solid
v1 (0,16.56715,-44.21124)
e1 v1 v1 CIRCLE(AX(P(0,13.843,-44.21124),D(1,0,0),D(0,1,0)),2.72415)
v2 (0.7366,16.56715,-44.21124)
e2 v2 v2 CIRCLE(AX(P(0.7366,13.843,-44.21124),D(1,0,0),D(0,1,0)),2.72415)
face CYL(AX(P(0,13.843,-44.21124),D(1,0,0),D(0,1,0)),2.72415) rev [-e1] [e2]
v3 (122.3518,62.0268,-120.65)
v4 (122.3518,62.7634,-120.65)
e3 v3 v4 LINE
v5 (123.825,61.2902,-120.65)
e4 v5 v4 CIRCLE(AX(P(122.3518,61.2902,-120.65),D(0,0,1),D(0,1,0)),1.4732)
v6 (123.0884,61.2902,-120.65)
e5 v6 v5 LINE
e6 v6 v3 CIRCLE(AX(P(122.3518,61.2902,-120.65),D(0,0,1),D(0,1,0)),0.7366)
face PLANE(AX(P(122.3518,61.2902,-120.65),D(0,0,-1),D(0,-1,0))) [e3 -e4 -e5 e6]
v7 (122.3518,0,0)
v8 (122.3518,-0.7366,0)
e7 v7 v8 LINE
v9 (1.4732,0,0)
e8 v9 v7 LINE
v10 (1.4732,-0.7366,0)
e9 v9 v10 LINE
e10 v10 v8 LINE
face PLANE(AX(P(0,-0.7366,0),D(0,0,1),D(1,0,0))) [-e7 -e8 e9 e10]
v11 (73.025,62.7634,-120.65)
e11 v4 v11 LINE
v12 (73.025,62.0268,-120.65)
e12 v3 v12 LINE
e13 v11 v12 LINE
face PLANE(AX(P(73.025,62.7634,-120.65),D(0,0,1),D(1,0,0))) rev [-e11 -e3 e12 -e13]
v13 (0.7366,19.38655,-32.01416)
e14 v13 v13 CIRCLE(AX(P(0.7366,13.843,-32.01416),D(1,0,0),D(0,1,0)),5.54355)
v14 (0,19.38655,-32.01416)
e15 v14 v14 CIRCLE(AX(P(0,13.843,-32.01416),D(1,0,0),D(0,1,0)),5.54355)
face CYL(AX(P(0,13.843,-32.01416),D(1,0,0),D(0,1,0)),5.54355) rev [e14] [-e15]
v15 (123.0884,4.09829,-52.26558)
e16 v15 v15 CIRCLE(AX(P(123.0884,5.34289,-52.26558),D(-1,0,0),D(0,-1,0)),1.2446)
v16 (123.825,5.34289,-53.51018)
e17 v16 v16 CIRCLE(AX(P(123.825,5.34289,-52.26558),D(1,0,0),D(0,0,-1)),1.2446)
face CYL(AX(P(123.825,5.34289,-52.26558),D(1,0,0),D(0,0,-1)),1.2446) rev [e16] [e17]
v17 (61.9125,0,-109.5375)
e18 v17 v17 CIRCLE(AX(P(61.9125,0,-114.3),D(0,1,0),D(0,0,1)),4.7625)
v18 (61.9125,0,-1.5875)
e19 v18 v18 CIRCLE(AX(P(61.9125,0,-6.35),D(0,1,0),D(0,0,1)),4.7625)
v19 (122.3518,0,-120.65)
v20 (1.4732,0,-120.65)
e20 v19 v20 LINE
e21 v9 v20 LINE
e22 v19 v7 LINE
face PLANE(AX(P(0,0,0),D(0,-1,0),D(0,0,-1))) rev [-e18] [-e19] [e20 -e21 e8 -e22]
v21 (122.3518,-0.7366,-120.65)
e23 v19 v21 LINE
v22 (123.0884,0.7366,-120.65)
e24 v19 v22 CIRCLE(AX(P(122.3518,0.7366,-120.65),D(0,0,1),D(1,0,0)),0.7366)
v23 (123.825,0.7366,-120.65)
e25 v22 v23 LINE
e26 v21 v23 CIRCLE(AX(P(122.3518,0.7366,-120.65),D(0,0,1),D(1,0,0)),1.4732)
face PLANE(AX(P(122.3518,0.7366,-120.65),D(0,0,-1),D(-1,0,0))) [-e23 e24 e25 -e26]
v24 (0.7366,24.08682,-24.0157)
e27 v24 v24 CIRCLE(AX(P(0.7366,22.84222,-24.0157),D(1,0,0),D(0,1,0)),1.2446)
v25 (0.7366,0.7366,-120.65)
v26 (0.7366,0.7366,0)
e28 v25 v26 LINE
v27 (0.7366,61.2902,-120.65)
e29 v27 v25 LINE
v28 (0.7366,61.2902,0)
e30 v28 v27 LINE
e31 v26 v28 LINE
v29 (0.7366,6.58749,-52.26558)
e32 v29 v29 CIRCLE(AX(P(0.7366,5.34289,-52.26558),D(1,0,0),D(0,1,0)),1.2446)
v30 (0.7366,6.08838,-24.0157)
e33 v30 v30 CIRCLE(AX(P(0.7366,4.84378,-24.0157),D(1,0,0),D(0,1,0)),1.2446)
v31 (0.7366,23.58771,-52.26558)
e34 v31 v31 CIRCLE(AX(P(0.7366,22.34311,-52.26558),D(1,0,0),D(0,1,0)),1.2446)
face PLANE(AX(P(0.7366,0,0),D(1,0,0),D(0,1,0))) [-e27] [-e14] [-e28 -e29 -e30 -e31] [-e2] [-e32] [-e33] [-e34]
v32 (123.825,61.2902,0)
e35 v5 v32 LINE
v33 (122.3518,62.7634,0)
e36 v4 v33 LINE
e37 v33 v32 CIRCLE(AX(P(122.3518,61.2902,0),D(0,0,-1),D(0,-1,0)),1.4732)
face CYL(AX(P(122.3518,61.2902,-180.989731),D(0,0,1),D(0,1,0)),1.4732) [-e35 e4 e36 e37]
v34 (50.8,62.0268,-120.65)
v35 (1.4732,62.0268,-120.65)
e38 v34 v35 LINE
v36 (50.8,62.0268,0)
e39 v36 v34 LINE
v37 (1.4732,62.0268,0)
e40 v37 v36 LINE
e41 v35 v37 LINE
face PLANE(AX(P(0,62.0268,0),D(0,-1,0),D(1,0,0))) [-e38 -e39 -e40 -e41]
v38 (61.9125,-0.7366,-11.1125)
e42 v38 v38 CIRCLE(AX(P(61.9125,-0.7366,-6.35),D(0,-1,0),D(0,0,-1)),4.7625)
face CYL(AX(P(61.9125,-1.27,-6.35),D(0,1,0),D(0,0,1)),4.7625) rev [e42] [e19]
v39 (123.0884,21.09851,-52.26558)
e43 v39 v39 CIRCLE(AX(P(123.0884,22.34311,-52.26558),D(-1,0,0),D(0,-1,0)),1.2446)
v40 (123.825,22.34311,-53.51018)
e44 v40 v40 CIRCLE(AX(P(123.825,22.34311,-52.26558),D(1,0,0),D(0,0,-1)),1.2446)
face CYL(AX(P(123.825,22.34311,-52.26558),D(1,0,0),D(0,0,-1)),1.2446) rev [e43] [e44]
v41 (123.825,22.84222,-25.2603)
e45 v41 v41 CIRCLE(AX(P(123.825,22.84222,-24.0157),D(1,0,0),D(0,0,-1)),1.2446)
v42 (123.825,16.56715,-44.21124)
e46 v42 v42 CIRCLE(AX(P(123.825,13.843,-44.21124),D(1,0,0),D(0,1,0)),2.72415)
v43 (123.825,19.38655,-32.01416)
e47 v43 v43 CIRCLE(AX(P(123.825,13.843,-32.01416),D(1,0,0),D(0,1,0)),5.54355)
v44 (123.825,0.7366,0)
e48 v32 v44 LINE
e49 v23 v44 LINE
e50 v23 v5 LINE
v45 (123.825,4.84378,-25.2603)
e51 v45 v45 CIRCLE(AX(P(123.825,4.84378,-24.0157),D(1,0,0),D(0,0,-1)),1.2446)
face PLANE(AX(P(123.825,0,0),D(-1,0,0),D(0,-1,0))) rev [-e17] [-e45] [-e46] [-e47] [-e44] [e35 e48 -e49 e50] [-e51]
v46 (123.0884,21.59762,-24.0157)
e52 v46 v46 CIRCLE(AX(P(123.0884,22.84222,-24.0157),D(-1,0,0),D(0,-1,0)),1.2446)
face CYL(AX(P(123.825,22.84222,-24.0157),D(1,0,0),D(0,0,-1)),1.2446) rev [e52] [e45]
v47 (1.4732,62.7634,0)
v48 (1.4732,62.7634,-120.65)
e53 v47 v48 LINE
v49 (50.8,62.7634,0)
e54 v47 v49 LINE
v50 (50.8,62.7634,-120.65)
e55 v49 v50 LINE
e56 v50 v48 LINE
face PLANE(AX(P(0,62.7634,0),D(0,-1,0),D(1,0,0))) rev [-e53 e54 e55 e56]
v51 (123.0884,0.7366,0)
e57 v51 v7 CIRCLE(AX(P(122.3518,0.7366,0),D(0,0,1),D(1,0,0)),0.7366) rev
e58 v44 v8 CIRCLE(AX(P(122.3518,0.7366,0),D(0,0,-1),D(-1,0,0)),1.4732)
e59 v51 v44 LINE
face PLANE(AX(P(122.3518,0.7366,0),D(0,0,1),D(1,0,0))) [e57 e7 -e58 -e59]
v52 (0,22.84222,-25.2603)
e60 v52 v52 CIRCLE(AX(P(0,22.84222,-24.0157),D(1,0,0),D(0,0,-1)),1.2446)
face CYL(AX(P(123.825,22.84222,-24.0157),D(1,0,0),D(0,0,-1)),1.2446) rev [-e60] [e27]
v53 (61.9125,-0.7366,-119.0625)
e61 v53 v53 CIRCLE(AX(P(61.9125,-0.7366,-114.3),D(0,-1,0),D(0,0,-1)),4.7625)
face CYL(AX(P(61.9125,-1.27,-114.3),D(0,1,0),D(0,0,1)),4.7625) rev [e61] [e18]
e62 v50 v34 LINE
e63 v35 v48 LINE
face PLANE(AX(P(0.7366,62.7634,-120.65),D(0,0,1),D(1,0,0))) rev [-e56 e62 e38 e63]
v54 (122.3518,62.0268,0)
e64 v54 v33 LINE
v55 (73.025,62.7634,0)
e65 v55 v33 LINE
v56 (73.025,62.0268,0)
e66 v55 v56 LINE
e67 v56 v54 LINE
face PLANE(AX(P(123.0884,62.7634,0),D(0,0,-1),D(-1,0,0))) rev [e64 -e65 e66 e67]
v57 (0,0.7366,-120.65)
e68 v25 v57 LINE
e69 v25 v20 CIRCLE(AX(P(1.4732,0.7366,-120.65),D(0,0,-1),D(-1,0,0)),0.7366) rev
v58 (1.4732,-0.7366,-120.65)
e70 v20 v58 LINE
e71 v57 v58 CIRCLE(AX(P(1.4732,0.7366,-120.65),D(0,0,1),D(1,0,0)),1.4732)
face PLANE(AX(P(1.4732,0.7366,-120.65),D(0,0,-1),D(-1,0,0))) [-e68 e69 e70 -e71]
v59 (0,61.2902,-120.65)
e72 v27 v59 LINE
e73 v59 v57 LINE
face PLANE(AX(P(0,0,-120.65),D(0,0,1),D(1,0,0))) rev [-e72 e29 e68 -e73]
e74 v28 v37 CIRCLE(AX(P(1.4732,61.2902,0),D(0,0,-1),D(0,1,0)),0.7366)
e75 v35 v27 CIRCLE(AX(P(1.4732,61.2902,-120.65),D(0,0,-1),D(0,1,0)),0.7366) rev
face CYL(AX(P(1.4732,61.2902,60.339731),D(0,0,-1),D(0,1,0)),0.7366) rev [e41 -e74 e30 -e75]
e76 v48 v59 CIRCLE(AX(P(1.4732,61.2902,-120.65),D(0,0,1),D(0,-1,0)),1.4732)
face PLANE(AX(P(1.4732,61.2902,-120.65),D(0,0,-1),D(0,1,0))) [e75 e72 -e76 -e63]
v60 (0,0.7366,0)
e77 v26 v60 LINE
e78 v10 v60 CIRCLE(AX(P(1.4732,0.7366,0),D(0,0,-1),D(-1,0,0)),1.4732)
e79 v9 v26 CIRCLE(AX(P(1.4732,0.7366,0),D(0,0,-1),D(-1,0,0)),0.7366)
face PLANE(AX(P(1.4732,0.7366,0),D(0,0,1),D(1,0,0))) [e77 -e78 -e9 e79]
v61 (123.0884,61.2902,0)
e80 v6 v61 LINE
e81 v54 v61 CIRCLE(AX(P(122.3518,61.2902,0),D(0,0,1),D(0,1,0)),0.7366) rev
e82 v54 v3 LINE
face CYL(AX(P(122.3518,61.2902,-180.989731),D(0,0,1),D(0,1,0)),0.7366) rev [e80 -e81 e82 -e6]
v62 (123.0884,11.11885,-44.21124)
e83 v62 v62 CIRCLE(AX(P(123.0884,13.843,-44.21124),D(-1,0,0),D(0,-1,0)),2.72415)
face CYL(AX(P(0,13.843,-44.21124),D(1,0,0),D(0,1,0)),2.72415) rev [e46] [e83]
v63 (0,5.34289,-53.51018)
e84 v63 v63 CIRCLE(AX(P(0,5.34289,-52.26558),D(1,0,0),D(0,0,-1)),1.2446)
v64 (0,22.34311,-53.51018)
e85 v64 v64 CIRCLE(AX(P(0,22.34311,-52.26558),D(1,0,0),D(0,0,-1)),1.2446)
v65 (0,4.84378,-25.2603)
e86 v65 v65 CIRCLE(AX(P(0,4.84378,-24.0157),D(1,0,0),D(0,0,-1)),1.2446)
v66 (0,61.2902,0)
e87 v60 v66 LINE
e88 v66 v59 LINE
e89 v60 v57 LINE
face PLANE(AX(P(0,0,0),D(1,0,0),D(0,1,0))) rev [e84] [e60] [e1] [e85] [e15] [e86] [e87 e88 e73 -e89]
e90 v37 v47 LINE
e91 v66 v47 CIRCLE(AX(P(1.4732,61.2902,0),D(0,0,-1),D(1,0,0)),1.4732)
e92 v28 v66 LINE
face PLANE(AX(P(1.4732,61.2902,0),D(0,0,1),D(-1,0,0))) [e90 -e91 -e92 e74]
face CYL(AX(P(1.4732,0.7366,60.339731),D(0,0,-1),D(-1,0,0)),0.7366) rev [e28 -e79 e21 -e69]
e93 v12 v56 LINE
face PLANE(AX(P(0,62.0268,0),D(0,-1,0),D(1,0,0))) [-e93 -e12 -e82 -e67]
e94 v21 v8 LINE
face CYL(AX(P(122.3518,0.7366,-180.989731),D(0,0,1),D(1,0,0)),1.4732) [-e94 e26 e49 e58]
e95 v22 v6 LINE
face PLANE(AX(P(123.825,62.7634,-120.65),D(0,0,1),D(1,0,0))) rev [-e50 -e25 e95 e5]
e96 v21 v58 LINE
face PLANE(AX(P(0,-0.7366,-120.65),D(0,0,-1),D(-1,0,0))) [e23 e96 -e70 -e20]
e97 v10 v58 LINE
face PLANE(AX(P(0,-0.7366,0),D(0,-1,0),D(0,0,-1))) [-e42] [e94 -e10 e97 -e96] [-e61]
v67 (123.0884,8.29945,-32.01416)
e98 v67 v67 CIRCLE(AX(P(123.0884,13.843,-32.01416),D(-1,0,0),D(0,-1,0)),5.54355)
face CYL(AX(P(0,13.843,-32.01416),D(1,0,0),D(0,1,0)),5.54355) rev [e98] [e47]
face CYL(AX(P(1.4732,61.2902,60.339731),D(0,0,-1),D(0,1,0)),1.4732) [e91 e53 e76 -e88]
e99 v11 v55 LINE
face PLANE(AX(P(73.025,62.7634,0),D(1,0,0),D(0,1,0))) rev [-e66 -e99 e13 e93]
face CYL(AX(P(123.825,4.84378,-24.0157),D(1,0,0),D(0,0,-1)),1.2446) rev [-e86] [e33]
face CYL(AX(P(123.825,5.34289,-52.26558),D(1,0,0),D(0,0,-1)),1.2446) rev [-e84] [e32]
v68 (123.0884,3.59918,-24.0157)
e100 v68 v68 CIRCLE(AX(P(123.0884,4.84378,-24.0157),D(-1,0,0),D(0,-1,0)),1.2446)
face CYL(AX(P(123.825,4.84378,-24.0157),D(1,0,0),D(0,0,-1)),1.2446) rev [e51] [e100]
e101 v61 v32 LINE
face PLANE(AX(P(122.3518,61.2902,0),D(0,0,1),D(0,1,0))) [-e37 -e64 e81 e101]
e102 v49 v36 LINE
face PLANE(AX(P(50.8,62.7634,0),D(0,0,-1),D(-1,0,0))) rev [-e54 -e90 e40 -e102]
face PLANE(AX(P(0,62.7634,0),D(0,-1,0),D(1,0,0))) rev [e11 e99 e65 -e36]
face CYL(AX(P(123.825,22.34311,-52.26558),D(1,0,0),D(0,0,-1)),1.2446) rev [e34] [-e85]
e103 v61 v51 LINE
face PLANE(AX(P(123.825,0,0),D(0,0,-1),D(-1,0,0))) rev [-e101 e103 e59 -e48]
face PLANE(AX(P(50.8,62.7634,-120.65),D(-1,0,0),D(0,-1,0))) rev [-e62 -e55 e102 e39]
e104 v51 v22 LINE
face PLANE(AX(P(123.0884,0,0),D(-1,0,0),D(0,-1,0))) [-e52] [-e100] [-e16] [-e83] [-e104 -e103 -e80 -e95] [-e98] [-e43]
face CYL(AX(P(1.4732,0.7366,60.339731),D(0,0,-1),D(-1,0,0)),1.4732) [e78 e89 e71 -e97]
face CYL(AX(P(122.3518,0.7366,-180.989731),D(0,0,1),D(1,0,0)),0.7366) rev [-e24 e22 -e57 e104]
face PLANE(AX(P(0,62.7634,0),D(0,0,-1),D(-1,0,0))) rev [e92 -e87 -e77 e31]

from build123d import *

# Parameters (mm, degrees)
SKETCH1_W                      = 123.825
SKETCH1_H                      = 120.65
BASE_FLANGE1_DEPTH             = 0.7366
EDGE_FLANGE1_STRIP_W           = 4.4196
EDGE_FLANGE1_STRIP_H           = 0.7366
EDGE_FLANGE1_STRIP_CUT_DEPTH   = 120.65
EDGE_FLANGE1_STRIP_2_W         = 4.4196
EDGE_FLANGE1_STRIP_2_H         = 0.7366
EDGE_FLANGE1_STRIP_CUT_2_DEPTH = 120.65
EDGE_FLANGE1_DEPTH             = 120.65
EDGE_FLANGE1_BEND_DEPTH        = 120.65
EDGE_FLANGE2_STRIP_W           = 4.4196
EDGE_FLANGE2_STRIP_H           = 0.7366
EDGE_FLANGE2_STRIP_CUT_DEPTH   = 120.65
EDGE_FLANGE2_DEPTH             = 120.65
EDGE_FLANGE3_STRIP_W           = 4.4196
EDGE_FLANGE3_STRIP_H           = 0.7366
EDGE_FLANGE3_STRIP_CUT_DEPTH   = 120.65
EDGE_FLANGE3_DEPTH             = 120.65
F_4_CLEARANCE_HOLE1_D          = 2.4892
SKETCH28_R                     = 5.54355
SKETCH28_R_2                   = 2.72415
CUT_EXTRUDE1_DEPTH             = 221.859453756
UNFOLD1_OUTLINE_W              = 50.8
UNFOLD1_OUTLINE_H              = 120.65
UNFOLD1_DEPTH                  = 62.7634
UNFOLD1_START                  = -0.7366
UNFOLD1_2_OUTLINE_W            = 162.678345723
UNFOLD1_2_OUTLINE_H            = 120.65
UNFOLD1_2_OUTLINE_R            = 1.2446
UNFOLD1_2_OUTLINE_R_2          = 5.54355
UNFOLD1_2_OUTLINE_R_3          = 2.72415
UNFOLD1_2_DEPTH                = 0.7366
SKETCH30_R                     = 4.7625
CUT_EXTRUDE2_DEPTH             = 1.27
FOLD1_START                    = -111.878345723
FOLD1_OUTLINE_W                = 0.7366
FOLD1_OUTLINE_H                = 120.65
FOLD1_DEPTH                    = 112.029702291
FOLD1_START_2                  = 123.673643432
FOLD1_2_OUTLINE_W              = 0.7366
FOLD1_2_OUTLINE_H              = 120.65
FOLD1_2_DEPTH                  = 112.029702291
FOLD1_START_3                  = 1.4732
FOLD1_3_OUTLINE_W              = 0.7366
FOLD1_3_OUTLINE_H              = 120.65
FOLD1_3_DEPTH                  = 49.3268
FOLD1_START_4                  = 73.025
FOLD1_4_OUTLINE_W              = 0.7366
FOLD1_4_OUTLINE_H              = 120.65
FOLD1_4_DEPTH                  = 49.3268
FOLD1_START_5                  = 0.732563432
FOLD1_5_OUTLINE_W              = 62.0268
FOLD1_5_OUTLINE_H              = 120.65
FOLD1_5_OUTLINE_R              = 1.2446
FOLD1_5_OUTLINE_R_2            = 2.72415
FOLD1_5_OUTLINE_R_3            = 5.54355
FOLD1_5_DEPTH                  = 0.004036568
FOLD1_START_6                  = 123.0884
FOLD1_6_OUTLINE_W              = 62.0268
FOLD1_6_OUTLINE_H              = 120.65
FOLD1_6_OUTLINE_R              = 1.2446
FOLD1_6_OUTLINE_R_2            = 2.72415
FOLD1_6_OUTLINE_R_3            = 5.54355
FOLD1_6_DEPTH                  = 0.004036568
FOLD1_7_OUTLINE_W              = 62.0268
FOLD1_7_OUTLINE_H              = 120.65
FOLD1_7_OUTLINE_R              = 1.2446
FOLD1_7_OUTLINE_R_2            = 2.72415
FOLD1_7_OUTLINE_R_3            = 5.54355
FOLD1_7_DEPTH                  = 1.4732
FOLD1_START_7                  = 122.3518
FOLD1_8_OUTLINE_W              = 62.0268
FOLD1_8_OUTLINE_H              = 120.65
FOLD1_8_OUTLINE_R              = 1.2446
FOLD1_8_OUTLINE_R_2            = 2.72415
FOLD1_8_OUTLINE_R_3            = 5.54355
FOLD1_8_DEPTH                  = 1.4732
FOLD1_START_8                  = -120.65
FOLD1_9_DEPTH                  = 120.65
FOLD1_10_DEPTH                 = 120.65


with BuildPart() as part:
    # Base-Flange1: sheet metal written as solids
    # Sketch1 → Base-Flange1 (new body)
    with BuildSketch(Plane(origin=(0, 0, 0), x_dir=(1, 0, 0), z_dir=(0, 1, 0))):
        with Locations((61.9125, 60.325)):
            Rectangle(SKETCH1_W, SKETCH1_H)
    extrude(amount=-BASE_FLANGE1_DEPTH)

    # Edge-Flange1: sheet metal written as solids
    # Edge-Flange1 strip (on a plane across the edge) → Edge-Flange1 strip cut (cut)
    with BuildSketch(Plane(origin=(123.825, 0, 0), x_dir=(-1, 0, 0), z_dir=(0, 0, -1))):
        with Locations((-0.7366, -0.3683)):
            Rectangle(EDGE_FLANGE1_STRIP_W, EDGE_FLANGE1_STRIP_H)
    extrude(amount=EDGE_FLANGE1_STRIP_CUT_DEPTH, mode=Mode.SUBTRACT)

    # Edge-Flange1 strip 2 (on a plane across the edge) → Edge-Flange1 strip cut 2 (cut)
    with BuildSketch(Plane.XY.offset(-120.65)):
        with Locations((-0.7366, -0.3683)):
            Rectangle(EDGE_FLANGE1_STRIP_2_W, EDGE_FLANGE1_STRIP_2_H)
    extrude(amount=EDGE_FLANGE1_STRIP_CUT_2_DEPTH, mode=Mode.SUBTRACT)

    # Edge-Flange1 section (on a plane across the edge) → Edge-Flange1 (add)
    with BuildSketch(Plane(origin=(123.825, 0, 0), x_dir=(-1, 0, 0), z_dir=(0, 0, -1))):
        with BuildLine():
            Line((0, 0.7366), (0, 62.7634))
            Line((0, 62.7634), (0.7366, 62.7634))
            Line((0.7366, 62.7634), (0.7366, 0.7366))
            ThreePointArc((0.7366, 0.7366), (0.952345145, 0.215745145), (1.4732, 0))
            Line((1.4732, 0), (1.4732, -0.7366))
            ThreePointArc((1.4732, -0.7366), (0.43149029, -0.30510971), (0, 0.7366))
        make_face()
    extrude(amount=EDGE_FLANGE1_DEPTH)

    # Edge-Flange1 section 2 (on a plane across the edge) → Edge-Flange1 bend (add)
    with BuildSketch(Plane.XY.offset(-120.65)):
        with BuildLine():
            Line((0, 0.7366), (0, 62.7634))
            Line((0, 62.7634), (0.7366, 62.7634))
            Line((0.7366, 62.7634), (0.7366, 0.7366))
            ThreePointArc((0.7366, 0.7366), (0.952345145, 0.215745145), (1.4732, 0))
            Line((1.4732, 0), (1.4732, -0.7366))
            ThreePointArc((1.4732, -0.7366), (0.43149029, -0.30510971), (0, 0.7366))
        make_face()
    extrude(amount=EDGE_FLANGE1_BEND_DEPTH)

    # Edge-Flange2: sheet metal written as solids
    # Edge-Flange2 strip (on a plane across the edge) → Edge-Flange2 strip cut (cut)
    with BuildSketch(Plane(origin=(123.0884, 62.7634, 0), x_dir=(0, -1, 0), z_dir=(0, 0, -1))):
        with Locations((-0.7366, -0.3683)):
            Rectangle(EDGE_FLANGE2_STRIP_W, EDGE_FLANGE2_STRIP_H)
    extrude(amount=EDGE_FLANGE2_STRIP_CUT_DEPTH, mode=Mode.SUBTRACT)

    # Edge-Flange2 section (on a plane across the edge) → Edge-Flange2 (add)
    with BuildSketch(Plane(origin=(123.0884, 62.7634, 0), x_dir=(0, -1, 0), z_dir=(0, 0, -1))):
        with BuildLine():
            Line((0, 0.7366), (0, 50.0634))
            Line((0, 50.0634), (0.7366, 50.0634))
            Line((0.7366, 50.0634), (0.7366, 0.7366))
            ThreePointArc((0.7366, 0.7366), (0.952345145, 0.215745145), (1.4732, 0))
            Line((1.4732, 0), (1.4732, -0.7366))
            ThreePointArc((1.4732, -0.7366), (0.43149029, -0.30510971), (0, 0.7366))
        make_face()
    extrude(amount=EDGE_FLANGE2_DEPTH)

    # Edge-Flange3: sheet metal written as solids
    # Edge-Flange3 strip (on a plane across the edge) → Edge-Flange3 strip cut (cut)
    with BuildSketch(Plane(origin=(0.7366, 62.7634, -120.65), x_dir=(0, -1, 0), z_dir=(0, 0, 1))):
        with Locations((-0.7366, -0.3683)):
            Rectangle(EDGE_FLANGE3_STRIP_W, EDGE_FLANGE3_STRIP_H)
    extrude(amount=EDGE_FLANGE3_STRIP_CUT_DEPTH, mode=Mode.SUBTRACT)

    # Edge-Flange3 section (on a plane across the edge) → Edge-Flange3 (add)
    with BuildSketch(Plane(origin=(0.7366, 62.7634, -120.65), x_dir=(0, -1, 0), z_dir=(0, 0, 1))):
        with BuildLine():
            Line((0, 0.7366), (0, 50.0634))
            Line((0, 50.0634), (0.7366, 50.0634))
            Line((0.7366, 50.0634), (0.7366, 0.7366))
            ThreePointArc((0.7366, 0.7366), (0.952345145, 0.215745145), (1.4732, 0))
            Line((1.4732, 0), (1.4732, -0.7366))
            ThreePointArc((1.4732, -0.7366), (0.43149029, -0.30510971), (0, 0.7366))
        make_face()
    extrude(amount=EDGE_FLANGE3_DEPTH)

    # #4 Clearance Hole1 (through all)
    with Locations(Plane(origin=(123.825, -24.718066827, -160.602803993), x_dir=(0, 0, -1), z_dir=(1, 0, 0))):
        with Locations((-136.587103993, 47.560286827), (-136.587103993, 29.561846827), (-108.337223993, 47.061176827), (-108.337223993, 30.060956827)):
            Hole(F_4_CLEARANCE_HOLE1_D / 2)

    # Sketch28 → Cut-Extrude1 (cut, through all)
    with BuildSketch(Plane(origin=(123.825, -24.718066827, -160.602803993), x_dir=(0, 0, -1), z_dir=(1, 0, 0))):
        with Locations(Location((-128.588643993, 38.561066827, 0), (0, 0, 90))):
            Circle(SKETCH28_R)
        with Locations(Location((-116.391563993, 38.561066827, 0), (0, 0, 90))):
            Circle(SKETCH28_R_2)
    extrude(amount=-CUT_EXTRUDE1_DEPTH, mode=Mode.SUBTRACT)

    # Unfold1: read off the stored shape, not the designer's step
    # Unfold1 outline → Unfold1 (cut)
    with BuildSketch(Plane(origin=(0, 0, 0), x_dir=(1, 0, 0), z_dir=(0, 1, 0))):
        with Locations((25.4, 60.325)):
            Rectangle(UNFOLD1_OUTLINE_W, UNFOLD1_OUTLINE_H)
        with Locations((98.425, 60.325)):
            Rectangle(UNFOLD1_OUTLINE_W, UNFOLD1_OUTLINE_H)
    extrude(amount=UNFOLD1_DEPTH, mode=Mode.SUBTRACT)

    # Unfold1 2 outline → Unfold1 2 (add)
    # profile 1 of 2: a face of its own
    with BuildSketch(Plane(origin=(0, 0, 0), x_dir=(1, 0, 0), z_dir=(0, 1, 0)).offset(UNFOLD1_START)):
        with Locations((-30.539172862, 60.325)):
            Rectangle(UNFOLD1_2_OUTLINE_W, UNFOLD1_2_OUTLINE_H)
        with Locations((-22.367992861, 24.0157)):
            Circle(UNFOLD1_2_OUTLINE_R, mode=Mode.SUBTRACT)
        with Locations((-4.369552861, 24.0157)):
            Circle(UNFOLD1_2_OUTLINE_R, mode=Mode.SUBTRACT)
        with Locations((-13.368772861, 32.01416)):
            Circle(UNFOLD1_2_OUTLINE_R_2, mode=Mode.SUBTRACT)
        with Locations((-13.368772861, 44.21124)):
            Circle(UNFOLD1_2_OUTLINE_R_3, mode=Mode.SUBTRACT)
        with Locations((-21.868882861, 52.26558)):
            Circle(UNFOLD1_2_OUTLINE_R, mode=Mode.SUBTRACT)
        with Locations((-4.868662861, 52.26558)):
            Circle(UNFOLD1_2_OUTLINE_R, mode=Mode.SUBTRACT)
    # profile 2 of 2: a face of its own
    with BuildSketch(Plane(origin=(0, 0, 0), x_dir=(1, 0, 0), z_dir=(0, 1, 0)).offset(UNFOLD1_START)):
        with Locations((154.364172862, 60.325)):
            Rectangle(UNFOLD1_2_OUTLINE_W, UNFOLD1_2_OUTLINE_H)
        with Locations((145.693882861, 52.26558)):
            Circle(UNFOLD1_2_OUTLINE_R, mode=Mode.SUBTRACT)
        with Locations((128.194552861, 24.0157)):
            Circle(UNFOLD1_2_OUTLINE_R, mode=Mode.SUBTRACT)
        with Locations((146.192992861, 24.0157)):
            Circle(UNFOLD1_2_OUTLINE_R, mode=Mode.SUBTRACT)
        with Locations((137.193772861, 32.01416)):
            Circle(UNFOLD1_2_OUTLINE_R_2, mode=Mode.SUBTRACT)
        with Locations((137.193772861, 44.21124)):
            Circle(UNFOLD1_2_OUTLINE_R_3, mode=Mode.SUBTRACT)
        with Locations((128.693662861, 52.26558)):
            Circle(UNFOLD1_2_OUTLINE_R, mode=Mode.SUBTRACT)
    extrude(amount=UNFOLD1_2_DEPTH)

    # Sketch30 → Cut-Extrude2 (cut)
    with BuildSketch(Plane(origin=(0, 0, 0), x_dir=(1, 0, 0), z_dir=(0, 1, 0))):
        with Locations(Location((61.9125, 114.3, 0), (0, 0, 270))):
            Circle(SKETCH30_R)
        with Locations(Location((61.9125, 6.35, 0), (0, 0, 270))):
            Circle(SKETCH30_R)
    extrude(amount=-CUT_EXTRUDE2_DEPTH, mode=Mode.SUBTRACT)

    # Fold1: read off the stored shape, not the designer's step
    # Fold1 outline → Fold1 (cut)
    with BuildSketch(Plane.YZ.offset(FOLD1_START)):
        with Locations((-0.3683, -60.325)):
            Rectangle(FOLD1_OUTLINE_W, FOLD1_OUTLINE_H)
    extrude(amount=FOLD1_DEPTH, mode=Mode.SUBTRACT)

    # Fold1 2 outline → Fold1 2 (cut)
    with BuildSketch(Plane.YZ.offset(FOLD1_START_2)):
        with Locations((-0.3683, -60.325)):
            Rectangle(FOLD1_2_OUTLINE_W, FOLD1_2_OUTLINE_H)
    extrude(amount=FOLD1_2_DEPTH, mode=Mode.SUBTRACT)

    # Fold1 5 outline → Fold1 5 (add)
    with BuildSketch(Plane.YZ.offset(FOLD1_START_5)):
        with Locations((31.0134, -60.325)):
            Rectangle(FOLD1_5_OUTLINE_W, FOLD1_5_OUTLINE_H)
        with Locations((5.34289, -52.26558)):
            Circle(FOLD1_5_OUTLINE_R, mode=Mode.SUBTRACT)
        with Locations((13.843, -44.21124)):
            Circle(FOLD1_5_OUTLINE_R_2, mode=Mode.SUBTRACT)
        with Locations((13.843, -32.01416)):
            Circle(FOLD1_5_OUTLINE_R_3, mode=Mode.SUBTRACT)
        with Locations((22.34311, -52.26558)):
            Circle(FOLD1_5_OUTLINE_R, mode=Mode.SUBTRACT)
        with Locations((4.84378, -24.0157)):
            Circle(FOLD1_5_OUTLINE_R, mode=Mode.SUBTRACT)
        with Locations((22.84222, -24.0157)):
            Circle(FOLD1_5_OUTLINE_R, mode=Mode.SUBTRACT)
    extrude(amount=FOLD1_5_DEPTH)

    # Fold1 6 outline → Fold1 6 (add)
    with BuildSketch(Plane.YZ.offset(FOLD1_START_6)):
        with Locations((31.0134, -60.325)):
            Rectangle(FOLD1_6_OUTLINE_W, FOLD1_6_OUTLINE_H)
        with Locations((5.34289, -52.26558)):
            Circle(FOLD1_6_OUTLINE_R, mode=Mode.SUBTRACT)
        with Locations((13.843, -44.21124)):
            Circle(FOLD1_6_OUTLINE_R_2, mode=Mode.SUBTRACT)
        with Locations((13.843, -32.01416)):
            Circle(FOLD1_6_OUTLINE_R_3, mode=Mode.SUBTRACT)
        with Locations((22.34311, -52.26558)):
            Circle(FOLD1_6_OUTLINE_R, mode=Mode.SUBTRACT)
        with Locations((4.84378, -24.0157)):
            Circle(FOLD1_6_OUTLINE_R, mode=Mode.SUBTRACT)
        with Locations((22.84222, -24.0157)):
            Circle(FOLD1_6_OUTLINE_R, mode=Mode.SUBTRACT)
    extrude(amount=FOLD1_6_DEPTH)



with BuildPart() as body_2:
    # Fold1 3 outline → Fold1 3 (new body)
    with BuildSketch(Plane.YZ.offset(FOLD1_START_3)):
        with Locations((62.3951, -60.325)):
            Rectangle(FOLD1_3_OUTLINE_W, FOLD1_3_OUTLINE_H)
    extrude(amount=FOLD1_3_DEPTH)


with BuildPart() as body_3:
    # Fold1 4 outline → Fold1 4 (new body)
    with BuildSketch(Plane.YZ.offset(FOLD1_START_4)):
        with Locations((62.3951, -60.325)):
            Rectangle(FOLD1_4_OUTLINE_W, FOLD1_4_OUTLINE_H)
    extrude(amount=FOLD1_4_DEPTH)


with BuildPart() as part_1:
    add(part.part)

    add(body_2.part)  # Fold1 7 merges body 2
    # Fold1 7 outline → Fold1 7 (add)
    with BuildSketch(Plane.YZ):
        with Locations((31.0134, -60.325)):
            Rectangle(FOLD1_7_OUTLINE_W, FOLD1_7_OUTLINE_H)
        with Locations((5.34289, -52.26558)):
            Circle(FOLD1_7_OUTLINE_R, mode=Mode.SUBTRACT)
        with Locations((13.843, -44.21124)):
            Circle(FOLD1_7_OUTLINE_R_2, mode=Mode.SUBTRACT)
        with Locations((13.843, -32.01416)):
            Circle(FOLD1_7_OUTLINE_R_3, mode=Mode.SUBTRACT)
        with Locations((22.34311, -52.26558)):
            Circle(FOLD1_7_OUTLINE_R, mode=Mode.SUBTRACT)
        with Locations((4.84378, -24.0157)):
            Circle(FOLD1_7_OUTLINE_R, mode=Mode.SUBTRACT)
        with Locations((22.84222, -24.0157)):
            Circle(FOLD1_7_OUTLINE_R, mode=Mode.SUBTRACT)
    extrude(amount=FOLD1_7_DEPTH)


    add(body_3.part)  # Fold1 8 merges body 3
    # Fold1 8 outline → Fold1 8 (add)
    with BuildSketch(Plane.YZ.offset(FOLD1_START_7)):
        with Locations((31.0134, -60.325)):
            Rectangle(FOLD1_8_OUTLINE_W, FOLD1_8_OUTLINE_H)
        with Locations((5.34289, -52.26558)):
            Circle(FOLD1_8_OUTLINE_R, mode=Mode.SUBTRACT)
        with Locations((13.843, -44.21124)):
            Circle(FOLD1_8_OUTLINE_R_2, mode=Mode.SUBTRACT)
        with Locations((13.843, -32.01416)):
            Circle(FOLD1_8_OUTLINE_R_3, mode=Mode.SUBTRACT)
        with Locations((22.34311, -52.26558)):
            Circle(FOLD1_8_OUTLINE_R, mode=Mode.SUBTRACT)
        with Locations((4.84378, -24.0157)):
            Circle(FOLD1_8_OUTLINE_R, mode=Mode.SUBTRACT)
        with Locations((22.84222, -24.0157)):
            Circle(FOLD1_8_OUTLINE_R, mode=Mode.SUBTRACT)
    extrude(amount=FOLD1_8_DEPTH)

    # Fold1 9 outline → Fold1 9 (cut)
    with BuildSketch(Plane.XY.offset(FOLD1_START_8)):
        with BuildLine():
            Line((0.151356568, -0.7366), (1.4732, -0.7366))
            ThreePointArc((1.4732, -0.7366), (0.43149029, -0.30510971), (0, 0.7366))
            Line((0, 0.7366), (0, 0))
            Line((0, 0), (0.151356568, 0))
            Line((0.151356568, 0), (0.151356568, -0.7366))
        make_face()
        with BuildLine():
            ThreePointArc((123.0884, 61.2902), (122.872654855, 61.811054855), (122.3518, 62.0268))
            Line((122.3518, 62.0268), (122.3518, 0))
            ThreePointArc((122.3518, 0), (122.872654855, 0.215745145), (123.0884, 0.7366))
            Line((123.0884, 0.7366), (123.0884, 61.2902))
        make_face()
        with BuildLine():
            ThreePointArc((123.627628625, 62.0268), (123.774801927, 61.671492217), (123.825, 61.2902))
            Line((123.825, 61.2902), (123.825, 62.0268))
            Line((123.825, 62.0268), (123.627628625, 62.0268))
        make_face()
        with BuildLine():
            ThreePointArc((123.825, 0.7366), (123.39350971, -0.30510971), (122.3518, -0.7366))
            Line((122.3518, -0.7366), (123.673643432, -0.7366))
            Line((123.673643432, -0.7366), (123.673643432, 0))
            Line((123.673643432, 0), (123.825, 0))
            Line((123.825, 0), (123.825, 0.7366))
        make_face()
        with BuildLine():
            Line((1.4732, 0), (1.4732, 62.0268))
            ThreePointArc((1.4732, 62.0268), (0.952345145, 61.811054855), (0.7366, 61.2902))
            Line((0.7366, 61.2902), (0.7366, 0.7366))
            ThreePointArc((0.7366, 0.7366), (0.952345145, 0.215745145), (1.4732, 0))
        make_face()
        with BuildLine():
            Line((0, 62.0268), (0, 61.2902))
            ThreePointArc((0, 61.2902), (0.050198073, 61.671492217), (0.197371375, 62.0268))
            Line((0.197371375, 62.0268), (0, 62.0268))
        make_face()
    extrude(amount=FOLD1_9_DEPTH, mode=Mode.SUBTRACT)

    # Fold1 10 outline → Fold1 10 (add)
    with BuildSketch(Plane.XY.offset(FOLD1_START_8)):
        with BuildLine():
            Line((122.3518, 62.0268), (123.627628625, 62.0268))
            ThreePointArc((123.627628625, 62.0268), (123.0884, 62.566028625), (122.3518, 62.7634))
            Line((122.3518, 62.7634), (122.3518, 62.0268))
        make_face()
        with BuildLine():
            ThreePointArc((1.4732, 62.7634), (0.7366, 62.566028625), (0.197371375, 62.0268))
            Line((0.197371375, 62.0268), (1.4732, 62.0268))
            Line((1.4732, 62.0268), (1.4732, 62.7634))
        make_face()
    extrude(amount=FOLD1_10_DEPTH)


solid = part_1.part
